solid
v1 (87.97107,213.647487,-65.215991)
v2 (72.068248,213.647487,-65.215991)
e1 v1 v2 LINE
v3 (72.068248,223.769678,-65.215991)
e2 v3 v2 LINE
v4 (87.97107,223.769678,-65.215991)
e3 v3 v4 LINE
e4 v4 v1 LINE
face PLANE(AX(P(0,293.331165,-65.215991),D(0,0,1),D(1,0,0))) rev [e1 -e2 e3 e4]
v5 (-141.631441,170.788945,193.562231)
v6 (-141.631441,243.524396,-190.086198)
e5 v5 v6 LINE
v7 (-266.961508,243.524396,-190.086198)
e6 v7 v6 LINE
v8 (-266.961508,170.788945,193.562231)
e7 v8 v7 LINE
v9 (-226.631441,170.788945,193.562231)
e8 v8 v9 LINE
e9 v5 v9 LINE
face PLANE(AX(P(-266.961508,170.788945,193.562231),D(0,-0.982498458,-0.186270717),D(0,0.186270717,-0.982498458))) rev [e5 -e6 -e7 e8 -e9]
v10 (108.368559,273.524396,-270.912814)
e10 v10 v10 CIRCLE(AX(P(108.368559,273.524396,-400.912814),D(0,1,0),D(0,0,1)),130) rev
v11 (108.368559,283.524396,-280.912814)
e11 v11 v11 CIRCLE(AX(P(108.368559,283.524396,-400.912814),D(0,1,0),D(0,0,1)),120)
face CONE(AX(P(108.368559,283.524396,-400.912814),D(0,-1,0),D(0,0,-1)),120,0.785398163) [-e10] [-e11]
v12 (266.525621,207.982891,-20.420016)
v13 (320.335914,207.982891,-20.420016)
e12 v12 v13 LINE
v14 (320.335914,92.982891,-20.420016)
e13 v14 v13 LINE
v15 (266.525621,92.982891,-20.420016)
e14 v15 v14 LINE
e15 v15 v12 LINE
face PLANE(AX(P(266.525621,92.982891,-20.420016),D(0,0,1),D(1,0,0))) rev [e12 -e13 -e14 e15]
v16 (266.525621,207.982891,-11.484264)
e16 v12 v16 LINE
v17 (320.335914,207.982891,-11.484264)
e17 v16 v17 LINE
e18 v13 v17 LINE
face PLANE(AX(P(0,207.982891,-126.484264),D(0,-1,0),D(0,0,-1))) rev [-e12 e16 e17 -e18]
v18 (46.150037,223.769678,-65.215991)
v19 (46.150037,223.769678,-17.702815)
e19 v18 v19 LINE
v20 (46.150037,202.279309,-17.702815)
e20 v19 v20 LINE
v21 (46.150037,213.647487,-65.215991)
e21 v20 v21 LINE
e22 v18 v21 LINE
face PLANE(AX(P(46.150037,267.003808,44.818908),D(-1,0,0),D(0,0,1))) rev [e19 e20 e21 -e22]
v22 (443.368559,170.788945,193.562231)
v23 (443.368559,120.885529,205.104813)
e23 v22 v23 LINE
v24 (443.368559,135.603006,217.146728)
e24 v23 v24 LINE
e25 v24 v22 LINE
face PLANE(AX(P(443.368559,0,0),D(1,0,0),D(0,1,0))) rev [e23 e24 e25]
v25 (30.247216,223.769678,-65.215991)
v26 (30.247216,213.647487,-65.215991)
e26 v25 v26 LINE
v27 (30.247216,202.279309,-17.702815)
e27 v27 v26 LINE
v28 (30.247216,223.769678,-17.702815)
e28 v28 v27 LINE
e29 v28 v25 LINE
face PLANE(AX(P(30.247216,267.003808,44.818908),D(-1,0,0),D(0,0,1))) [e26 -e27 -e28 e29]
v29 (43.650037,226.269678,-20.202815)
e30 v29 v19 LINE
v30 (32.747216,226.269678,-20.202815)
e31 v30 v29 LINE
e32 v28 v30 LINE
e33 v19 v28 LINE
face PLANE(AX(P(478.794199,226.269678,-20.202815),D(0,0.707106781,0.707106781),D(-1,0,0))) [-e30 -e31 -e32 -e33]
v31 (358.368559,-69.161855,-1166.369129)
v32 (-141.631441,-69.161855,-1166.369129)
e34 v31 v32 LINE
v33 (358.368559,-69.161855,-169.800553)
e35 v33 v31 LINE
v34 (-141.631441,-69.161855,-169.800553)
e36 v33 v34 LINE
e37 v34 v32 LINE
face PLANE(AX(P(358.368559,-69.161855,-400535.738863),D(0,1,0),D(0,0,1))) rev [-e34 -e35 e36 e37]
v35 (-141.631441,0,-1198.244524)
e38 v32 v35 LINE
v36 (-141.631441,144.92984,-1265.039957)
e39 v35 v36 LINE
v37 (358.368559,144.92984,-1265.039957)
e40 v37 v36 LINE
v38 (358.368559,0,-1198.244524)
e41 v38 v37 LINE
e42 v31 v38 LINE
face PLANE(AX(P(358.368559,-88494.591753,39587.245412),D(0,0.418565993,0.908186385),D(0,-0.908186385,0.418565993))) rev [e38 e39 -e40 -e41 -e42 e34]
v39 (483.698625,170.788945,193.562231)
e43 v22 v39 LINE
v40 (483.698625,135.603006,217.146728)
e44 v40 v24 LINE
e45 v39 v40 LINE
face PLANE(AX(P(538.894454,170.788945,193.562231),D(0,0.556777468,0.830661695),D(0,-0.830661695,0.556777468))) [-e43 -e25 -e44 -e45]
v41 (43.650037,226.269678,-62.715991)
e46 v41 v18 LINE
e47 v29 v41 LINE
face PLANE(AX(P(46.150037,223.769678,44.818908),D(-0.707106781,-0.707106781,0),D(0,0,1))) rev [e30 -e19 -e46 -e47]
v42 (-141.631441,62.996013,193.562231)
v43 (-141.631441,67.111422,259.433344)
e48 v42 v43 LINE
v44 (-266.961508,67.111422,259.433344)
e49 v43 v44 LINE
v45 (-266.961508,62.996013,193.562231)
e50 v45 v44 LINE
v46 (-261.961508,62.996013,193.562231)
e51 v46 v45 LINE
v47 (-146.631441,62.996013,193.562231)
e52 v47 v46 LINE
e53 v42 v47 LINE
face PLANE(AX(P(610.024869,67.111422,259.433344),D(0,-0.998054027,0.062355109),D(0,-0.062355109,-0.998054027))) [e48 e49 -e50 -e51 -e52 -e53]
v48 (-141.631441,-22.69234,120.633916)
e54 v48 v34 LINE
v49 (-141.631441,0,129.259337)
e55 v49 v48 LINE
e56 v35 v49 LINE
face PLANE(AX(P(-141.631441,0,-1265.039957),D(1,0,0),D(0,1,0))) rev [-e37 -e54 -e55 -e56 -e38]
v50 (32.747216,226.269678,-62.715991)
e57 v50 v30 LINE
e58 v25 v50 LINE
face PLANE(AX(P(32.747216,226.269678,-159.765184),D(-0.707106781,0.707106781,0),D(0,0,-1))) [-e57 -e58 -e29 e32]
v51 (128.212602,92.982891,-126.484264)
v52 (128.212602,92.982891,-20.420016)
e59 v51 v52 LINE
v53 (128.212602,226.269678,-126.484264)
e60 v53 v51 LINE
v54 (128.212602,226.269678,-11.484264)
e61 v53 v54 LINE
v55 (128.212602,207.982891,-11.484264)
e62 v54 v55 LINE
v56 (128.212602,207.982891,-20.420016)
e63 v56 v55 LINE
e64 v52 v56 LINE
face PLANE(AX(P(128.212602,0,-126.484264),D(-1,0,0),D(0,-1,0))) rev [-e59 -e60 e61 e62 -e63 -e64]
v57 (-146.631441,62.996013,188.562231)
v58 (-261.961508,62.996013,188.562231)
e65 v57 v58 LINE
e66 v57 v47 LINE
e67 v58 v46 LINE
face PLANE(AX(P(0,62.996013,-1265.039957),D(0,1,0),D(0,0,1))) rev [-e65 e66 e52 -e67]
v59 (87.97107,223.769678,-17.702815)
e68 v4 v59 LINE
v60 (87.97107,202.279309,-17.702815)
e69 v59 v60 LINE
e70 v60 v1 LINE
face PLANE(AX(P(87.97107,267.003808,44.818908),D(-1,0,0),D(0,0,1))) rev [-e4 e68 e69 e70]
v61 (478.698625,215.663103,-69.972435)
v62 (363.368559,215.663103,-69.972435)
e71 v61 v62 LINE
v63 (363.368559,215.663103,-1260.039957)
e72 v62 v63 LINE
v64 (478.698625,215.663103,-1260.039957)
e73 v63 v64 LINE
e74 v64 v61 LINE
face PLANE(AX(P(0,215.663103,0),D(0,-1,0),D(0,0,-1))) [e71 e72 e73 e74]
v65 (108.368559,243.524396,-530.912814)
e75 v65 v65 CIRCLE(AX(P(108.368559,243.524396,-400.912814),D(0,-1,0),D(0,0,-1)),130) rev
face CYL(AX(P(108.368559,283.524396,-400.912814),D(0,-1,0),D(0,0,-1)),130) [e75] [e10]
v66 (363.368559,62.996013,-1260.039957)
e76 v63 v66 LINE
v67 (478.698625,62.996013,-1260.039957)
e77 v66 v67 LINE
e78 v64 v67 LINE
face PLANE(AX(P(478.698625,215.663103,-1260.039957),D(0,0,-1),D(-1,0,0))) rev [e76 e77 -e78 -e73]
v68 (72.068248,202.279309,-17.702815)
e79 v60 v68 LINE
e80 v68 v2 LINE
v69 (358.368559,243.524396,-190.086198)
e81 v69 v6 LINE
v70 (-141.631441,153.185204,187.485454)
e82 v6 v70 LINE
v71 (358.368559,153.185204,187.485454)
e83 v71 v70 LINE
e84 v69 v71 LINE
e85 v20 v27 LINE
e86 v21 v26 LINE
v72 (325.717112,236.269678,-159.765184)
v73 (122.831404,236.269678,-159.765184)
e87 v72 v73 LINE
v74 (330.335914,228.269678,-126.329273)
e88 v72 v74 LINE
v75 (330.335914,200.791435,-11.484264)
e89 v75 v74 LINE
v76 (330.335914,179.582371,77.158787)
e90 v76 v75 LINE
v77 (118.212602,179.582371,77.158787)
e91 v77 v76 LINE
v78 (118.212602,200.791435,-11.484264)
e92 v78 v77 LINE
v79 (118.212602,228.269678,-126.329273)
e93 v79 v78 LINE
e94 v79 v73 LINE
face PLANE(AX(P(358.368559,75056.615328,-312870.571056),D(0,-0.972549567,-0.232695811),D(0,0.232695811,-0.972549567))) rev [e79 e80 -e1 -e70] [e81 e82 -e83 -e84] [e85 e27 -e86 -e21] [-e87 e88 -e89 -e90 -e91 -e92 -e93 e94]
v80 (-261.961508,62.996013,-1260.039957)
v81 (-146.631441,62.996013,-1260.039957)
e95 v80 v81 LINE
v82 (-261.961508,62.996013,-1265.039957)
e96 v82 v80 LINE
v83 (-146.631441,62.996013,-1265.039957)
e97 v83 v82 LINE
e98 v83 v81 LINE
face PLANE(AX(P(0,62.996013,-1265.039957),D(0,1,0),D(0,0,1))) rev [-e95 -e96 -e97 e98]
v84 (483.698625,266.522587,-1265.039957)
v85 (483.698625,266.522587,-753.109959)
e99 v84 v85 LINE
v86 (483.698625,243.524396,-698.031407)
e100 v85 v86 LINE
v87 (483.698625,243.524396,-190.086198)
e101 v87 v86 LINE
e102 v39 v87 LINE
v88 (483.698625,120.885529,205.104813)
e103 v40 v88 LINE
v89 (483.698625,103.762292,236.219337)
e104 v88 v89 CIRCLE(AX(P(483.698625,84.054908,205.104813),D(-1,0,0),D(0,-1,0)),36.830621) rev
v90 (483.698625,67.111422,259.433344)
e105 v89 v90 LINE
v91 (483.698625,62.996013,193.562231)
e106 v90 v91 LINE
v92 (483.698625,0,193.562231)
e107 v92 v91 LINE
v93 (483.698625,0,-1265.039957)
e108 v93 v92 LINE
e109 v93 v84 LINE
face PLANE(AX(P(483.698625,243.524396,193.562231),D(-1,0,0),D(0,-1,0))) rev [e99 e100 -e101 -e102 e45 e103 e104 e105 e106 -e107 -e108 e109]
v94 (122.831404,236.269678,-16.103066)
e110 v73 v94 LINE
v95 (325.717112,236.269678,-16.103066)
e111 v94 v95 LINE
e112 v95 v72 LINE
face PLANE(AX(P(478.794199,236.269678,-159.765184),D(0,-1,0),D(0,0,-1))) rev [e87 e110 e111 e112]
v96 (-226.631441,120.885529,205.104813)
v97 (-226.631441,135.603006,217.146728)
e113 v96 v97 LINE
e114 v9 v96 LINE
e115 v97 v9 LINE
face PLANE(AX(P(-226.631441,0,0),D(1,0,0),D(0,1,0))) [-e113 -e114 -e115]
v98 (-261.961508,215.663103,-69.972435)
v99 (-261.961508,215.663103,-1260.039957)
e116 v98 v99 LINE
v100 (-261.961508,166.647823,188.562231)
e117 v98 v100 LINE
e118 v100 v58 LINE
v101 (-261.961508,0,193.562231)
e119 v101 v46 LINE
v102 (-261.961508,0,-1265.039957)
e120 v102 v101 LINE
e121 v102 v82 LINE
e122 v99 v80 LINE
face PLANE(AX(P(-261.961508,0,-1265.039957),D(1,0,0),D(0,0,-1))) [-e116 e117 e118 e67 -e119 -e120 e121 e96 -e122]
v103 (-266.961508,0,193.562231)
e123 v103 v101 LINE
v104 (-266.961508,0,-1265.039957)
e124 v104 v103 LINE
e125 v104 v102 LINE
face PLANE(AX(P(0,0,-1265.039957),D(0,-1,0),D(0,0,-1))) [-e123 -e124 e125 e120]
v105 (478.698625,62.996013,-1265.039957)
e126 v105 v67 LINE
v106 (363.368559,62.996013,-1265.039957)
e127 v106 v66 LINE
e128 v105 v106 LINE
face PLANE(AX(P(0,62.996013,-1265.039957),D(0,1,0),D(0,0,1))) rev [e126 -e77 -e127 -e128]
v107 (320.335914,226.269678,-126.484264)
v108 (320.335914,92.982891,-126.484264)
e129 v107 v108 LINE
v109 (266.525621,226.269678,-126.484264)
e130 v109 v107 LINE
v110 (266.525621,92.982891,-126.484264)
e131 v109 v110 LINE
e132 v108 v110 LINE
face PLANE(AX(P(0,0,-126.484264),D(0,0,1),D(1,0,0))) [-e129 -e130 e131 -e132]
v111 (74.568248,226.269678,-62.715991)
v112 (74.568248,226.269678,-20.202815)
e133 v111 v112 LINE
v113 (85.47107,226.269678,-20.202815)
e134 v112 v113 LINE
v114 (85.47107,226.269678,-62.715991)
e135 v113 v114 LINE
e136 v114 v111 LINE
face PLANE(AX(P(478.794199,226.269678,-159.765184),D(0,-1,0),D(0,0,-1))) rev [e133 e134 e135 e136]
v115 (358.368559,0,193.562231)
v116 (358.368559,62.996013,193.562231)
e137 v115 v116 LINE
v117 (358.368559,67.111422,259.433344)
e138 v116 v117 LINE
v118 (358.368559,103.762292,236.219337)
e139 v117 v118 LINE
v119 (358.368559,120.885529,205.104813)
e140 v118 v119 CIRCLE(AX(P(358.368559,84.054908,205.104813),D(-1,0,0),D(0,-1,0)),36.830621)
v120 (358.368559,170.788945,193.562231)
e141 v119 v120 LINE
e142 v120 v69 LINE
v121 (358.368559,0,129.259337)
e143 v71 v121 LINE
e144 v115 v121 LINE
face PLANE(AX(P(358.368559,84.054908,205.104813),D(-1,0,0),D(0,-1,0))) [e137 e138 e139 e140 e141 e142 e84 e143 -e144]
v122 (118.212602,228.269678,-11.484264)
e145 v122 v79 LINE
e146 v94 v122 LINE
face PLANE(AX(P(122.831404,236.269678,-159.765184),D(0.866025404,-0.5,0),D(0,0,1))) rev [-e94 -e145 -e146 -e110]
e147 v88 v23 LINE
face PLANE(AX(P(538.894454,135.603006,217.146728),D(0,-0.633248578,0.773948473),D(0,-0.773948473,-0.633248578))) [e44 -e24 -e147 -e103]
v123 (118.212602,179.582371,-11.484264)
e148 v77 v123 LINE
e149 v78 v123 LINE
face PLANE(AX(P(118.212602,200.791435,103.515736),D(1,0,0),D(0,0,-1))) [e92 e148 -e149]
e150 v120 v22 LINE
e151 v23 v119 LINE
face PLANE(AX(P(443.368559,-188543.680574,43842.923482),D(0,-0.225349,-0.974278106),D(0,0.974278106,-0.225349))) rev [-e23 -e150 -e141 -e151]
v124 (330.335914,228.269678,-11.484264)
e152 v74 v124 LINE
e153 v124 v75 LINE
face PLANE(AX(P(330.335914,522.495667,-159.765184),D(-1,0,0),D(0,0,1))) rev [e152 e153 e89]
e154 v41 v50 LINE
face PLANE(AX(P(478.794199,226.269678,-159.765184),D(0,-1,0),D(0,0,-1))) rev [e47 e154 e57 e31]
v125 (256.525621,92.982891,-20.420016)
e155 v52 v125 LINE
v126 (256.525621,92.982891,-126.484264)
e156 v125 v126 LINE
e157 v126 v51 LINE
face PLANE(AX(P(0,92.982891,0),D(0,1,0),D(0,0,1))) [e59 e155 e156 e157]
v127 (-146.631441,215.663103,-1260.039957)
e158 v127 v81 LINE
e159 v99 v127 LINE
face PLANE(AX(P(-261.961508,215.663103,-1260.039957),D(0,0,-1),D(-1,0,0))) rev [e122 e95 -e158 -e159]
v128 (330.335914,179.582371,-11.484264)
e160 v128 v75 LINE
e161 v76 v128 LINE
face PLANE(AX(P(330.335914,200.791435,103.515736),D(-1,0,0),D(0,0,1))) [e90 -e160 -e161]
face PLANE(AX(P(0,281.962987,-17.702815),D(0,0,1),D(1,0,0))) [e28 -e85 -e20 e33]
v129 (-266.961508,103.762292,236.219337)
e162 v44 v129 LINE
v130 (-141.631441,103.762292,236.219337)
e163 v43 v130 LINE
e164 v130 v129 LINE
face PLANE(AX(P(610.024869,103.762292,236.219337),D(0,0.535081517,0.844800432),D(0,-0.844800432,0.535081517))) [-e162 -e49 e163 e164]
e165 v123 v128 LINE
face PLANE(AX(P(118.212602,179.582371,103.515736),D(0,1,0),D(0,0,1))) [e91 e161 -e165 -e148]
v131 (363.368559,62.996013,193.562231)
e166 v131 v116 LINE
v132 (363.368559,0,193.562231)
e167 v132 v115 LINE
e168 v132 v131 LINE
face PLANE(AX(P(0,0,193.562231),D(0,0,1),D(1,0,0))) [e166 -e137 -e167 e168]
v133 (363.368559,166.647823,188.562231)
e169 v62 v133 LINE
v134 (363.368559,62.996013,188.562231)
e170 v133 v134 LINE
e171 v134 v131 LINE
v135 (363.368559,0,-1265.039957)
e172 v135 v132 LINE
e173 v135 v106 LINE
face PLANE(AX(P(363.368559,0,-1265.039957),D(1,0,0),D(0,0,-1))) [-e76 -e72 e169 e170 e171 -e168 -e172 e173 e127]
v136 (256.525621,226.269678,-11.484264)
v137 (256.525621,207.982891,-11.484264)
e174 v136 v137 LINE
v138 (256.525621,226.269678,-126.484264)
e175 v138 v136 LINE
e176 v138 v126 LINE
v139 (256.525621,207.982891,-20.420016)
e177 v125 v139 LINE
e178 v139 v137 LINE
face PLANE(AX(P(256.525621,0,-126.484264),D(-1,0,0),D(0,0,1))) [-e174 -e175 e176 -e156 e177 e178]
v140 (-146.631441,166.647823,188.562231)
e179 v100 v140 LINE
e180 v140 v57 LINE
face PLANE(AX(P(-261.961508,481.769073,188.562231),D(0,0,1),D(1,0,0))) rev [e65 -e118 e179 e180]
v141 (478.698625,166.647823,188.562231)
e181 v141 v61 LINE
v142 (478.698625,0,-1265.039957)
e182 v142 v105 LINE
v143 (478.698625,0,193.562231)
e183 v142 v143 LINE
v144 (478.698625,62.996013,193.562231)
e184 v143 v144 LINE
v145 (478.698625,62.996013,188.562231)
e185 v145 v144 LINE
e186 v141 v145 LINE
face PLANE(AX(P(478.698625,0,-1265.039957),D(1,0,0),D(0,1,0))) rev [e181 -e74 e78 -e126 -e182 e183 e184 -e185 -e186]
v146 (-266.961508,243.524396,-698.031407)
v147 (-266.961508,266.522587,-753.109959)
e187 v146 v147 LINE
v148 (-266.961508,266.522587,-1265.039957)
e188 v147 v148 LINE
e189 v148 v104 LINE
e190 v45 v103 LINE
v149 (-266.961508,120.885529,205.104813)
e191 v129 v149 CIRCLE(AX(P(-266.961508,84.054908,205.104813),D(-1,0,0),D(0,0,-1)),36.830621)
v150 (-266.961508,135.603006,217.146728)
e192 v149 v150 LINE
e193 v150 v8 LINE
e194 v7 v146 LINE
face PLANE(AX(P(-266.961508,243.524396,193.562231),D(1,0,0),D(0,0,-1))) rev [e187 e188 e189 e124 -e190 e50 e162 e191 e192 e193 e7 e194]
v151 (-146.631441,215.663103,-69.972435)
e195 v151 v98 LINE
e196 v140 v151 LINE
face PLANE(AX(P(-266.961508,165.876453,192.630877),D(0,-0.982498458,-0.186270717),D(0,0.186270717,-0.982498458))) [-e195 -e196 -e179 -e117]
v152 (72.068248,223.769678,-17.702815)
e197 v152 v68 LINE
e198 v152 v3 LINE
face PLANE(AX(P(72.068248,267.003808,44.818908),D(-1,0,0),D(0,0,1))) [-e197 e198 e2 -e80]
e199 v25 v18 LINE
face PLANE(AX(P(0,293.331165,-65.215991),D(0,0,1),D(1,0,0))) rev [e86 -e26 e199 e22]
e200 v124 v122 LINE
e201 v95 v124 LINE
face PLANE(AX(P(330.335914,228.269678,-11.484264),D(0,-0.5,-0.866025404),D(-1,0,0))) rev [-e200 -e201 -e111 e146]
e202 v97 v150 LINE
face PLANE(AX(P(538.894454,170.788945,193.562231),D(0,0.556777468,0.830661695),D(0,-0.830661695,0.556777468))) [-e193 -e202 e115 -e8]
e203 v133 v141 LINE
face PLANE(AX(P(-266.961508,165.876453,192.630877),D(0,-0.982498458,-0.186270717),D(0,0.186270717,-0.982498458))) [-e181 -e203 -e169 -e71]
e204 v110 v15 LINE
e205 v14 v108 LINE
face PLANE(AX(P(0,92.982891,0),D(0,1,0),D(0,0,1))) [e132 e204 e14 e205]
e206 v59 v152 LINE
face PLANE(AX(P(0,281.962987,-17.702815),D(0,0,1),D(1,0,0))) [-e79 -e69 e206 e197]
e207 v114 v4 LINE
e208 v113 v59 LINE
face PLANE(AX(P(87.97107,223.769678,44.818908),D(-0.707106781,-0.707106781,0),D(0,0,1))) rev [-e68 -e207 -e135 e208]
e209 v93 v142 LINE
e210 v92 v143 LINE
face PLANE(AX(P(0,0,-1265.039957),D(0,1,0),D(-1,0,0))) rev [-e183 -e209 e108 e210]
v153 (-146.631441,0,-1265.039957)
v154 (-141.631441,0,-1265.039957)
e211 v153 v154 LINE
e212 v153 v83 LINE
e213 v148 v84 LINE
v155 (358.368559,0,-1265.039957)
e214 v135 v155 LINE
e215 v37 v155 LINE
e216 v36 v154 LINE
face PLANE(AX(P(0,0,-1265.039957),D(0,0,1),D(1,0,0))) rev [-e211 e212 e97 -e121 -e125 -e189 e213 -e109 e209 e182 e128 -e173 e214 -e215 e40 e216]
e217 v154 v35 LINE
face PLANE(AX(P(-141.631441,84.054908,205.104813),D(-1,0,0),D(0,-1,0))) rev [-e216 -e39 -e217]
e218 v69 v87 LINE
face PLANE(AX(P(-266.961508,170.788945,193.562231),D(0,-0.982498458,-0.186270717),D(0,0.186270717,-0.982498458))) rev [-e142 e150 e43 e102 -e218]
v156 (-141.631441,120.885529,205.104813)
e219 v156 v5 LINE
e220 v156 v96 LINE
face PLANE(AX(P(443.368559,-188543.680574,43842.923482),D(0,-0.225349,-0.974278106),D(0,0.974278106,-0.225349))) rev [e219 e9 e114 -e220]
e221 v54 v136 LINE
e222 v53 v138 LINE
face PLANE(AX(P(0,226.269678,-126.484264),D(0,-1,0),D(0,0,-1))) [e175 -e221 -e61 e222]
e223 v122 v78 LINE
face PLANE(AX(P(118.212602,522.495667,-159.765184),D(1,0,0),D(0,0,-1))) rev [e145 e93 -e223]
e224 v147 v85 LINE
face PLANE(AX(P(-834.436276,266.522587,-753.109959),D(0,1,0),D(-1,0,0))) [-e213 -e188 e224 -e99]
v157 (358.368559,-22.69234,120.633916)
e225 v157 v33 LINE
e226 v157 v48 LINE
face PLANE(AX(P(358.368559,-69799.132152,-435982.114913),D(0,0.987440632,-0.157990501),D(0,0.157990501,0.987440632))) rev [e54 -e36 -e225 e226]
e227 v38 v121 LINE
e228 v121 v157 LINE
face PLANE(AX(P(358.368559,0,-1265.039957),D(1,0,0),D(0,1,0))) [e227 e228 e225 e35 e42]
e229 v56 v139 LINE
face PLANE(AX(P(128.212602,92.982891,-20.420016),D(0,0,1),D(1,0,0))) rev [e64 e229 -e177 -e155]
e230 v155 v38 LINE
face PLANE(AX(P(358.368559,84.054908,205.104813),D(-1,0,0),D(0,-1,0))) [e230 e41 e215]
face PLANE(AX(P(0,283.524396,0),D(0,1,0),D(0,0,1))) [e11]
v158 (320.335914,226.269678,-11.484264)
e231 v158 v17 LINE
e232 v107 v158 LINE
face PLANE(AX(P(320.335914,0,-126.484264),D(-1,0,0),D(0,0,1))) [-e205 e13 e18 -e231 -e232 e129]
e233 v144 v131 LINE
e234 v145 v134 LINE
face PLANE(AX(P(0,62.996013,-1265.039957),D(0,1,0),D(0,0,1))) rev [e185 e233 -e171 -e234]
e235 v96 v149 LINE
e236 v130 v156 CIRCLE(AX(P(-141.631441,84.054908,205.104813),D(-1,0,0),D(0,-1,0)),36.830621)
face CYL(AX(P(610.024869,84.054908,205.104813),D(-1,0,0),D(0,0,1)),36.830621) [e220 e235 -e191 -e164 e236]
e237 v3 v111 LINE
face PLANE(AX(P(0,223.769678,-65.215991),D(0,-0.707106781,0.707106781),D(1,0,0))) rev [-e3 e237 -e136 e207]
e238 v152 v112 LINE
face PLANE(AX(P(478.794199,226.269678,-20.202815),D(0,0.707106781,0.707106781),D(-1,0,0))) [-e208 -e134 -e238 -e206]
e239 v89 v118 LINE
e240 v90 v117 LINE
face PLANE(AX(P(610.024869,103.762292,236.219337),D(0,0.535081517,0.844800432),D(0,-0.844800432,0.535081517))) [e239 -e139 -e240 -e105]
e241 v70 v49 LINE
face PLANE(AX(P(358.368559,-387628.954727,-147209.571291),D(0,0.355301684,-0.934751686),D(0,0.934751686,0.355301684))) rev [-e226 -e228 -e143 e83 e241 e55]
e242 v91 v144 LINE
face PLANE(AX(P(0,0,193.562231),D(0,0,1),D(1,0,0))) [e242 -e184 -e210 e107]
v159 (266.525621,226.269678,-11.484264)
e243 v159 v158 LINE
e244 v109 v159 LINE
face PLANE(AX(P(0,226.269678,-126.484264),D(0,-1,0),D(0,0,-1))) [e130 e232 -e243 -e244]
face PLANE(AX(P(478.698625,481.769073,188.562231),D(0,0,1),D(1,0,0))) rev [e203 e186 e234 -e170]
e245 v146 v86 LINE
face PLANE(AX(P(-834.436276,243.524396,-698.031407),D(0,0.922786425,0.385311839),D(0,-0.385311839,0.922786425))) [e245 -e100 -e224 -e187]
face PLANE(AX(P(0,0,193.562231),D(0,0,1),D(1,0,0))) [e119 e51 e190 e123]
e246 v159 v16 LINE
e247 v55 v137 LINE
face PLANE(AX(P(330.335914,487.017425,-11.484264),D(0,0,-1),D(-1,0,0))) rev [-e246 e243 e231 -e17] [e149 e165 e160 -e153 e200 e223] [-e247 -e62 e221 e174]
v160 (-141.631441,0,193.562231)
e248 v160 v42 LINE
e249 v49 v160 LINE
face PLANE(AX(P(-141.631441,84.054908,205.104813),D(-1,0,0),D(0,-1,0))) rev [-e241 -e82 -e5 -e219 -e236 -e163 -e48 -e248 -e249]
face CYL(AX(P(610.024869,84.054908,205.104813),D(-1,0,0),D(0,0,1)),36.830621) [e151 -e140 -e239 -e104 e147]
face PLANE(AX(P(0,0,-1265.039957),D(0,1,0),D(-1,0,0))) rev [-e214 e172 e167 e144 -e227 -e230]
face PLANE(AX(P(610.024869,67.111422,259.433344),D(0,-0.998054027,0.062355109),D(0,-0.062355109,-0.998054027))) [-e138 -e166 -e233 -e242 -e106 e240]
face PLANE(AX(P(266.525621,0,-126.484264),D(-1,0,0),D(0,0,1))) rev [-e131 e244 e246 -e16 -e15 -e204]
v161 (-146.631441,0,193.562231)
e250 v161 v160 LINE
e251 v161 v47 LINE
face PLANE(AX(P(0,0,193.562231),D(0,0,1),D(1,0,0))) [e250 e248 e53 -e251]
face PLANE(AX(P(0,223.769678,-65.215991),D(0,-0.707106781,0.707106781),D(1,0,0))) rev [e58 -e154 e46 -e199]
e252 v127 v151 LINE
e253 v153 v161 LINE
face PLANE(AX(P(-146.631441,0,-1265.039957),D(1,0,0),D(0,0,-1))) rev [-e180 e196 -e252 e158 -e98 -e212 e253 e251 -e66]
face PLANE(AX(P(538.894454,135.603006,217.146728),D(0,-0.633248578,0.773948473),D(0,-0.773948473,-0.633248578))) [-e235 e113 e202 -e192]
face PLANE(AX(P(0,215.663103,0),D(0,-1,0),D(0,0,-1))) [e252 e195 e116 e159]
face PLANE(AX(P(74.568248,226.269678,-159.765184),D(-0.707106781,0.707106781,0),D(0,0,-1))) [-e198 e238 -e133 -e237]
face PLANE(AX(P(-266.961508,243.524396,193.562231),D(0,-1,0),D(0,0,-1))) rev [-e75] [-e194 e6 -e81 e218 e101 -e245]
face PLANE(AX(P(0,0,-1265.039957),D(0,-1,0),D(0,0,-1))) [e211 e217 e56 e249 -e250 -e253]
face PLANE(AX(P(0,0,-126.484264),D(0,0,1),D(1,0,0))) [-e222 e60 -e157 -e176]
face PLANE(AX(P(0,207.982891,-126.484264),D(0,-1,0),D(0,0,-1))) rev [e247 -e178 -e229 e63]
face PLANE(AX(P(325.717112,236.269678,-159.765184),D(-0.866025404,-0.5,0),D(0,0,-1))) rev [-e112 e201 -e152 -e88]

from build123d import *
from OCP.BRepAlgoAPI import BRepAlgoAPI_Cut
from OCP.TopTools import TopTools_ListOfShape
from OCP.BRepFilletAPI import BRepFilletAPI_MakeChamfer

# Parameters (mm, degrees)
BOSS_EXTRUDE1_DEPTH      = 193.56223071
BOSS_EXTRUDE1_DEPTH_BACK = 1265.039956588
SKETCH1_W                = 750.660133044
SKETCH1_H                = 349.862732427
SKETCH3_R                = 130
BOSS_EXTRUDE2_DEPTH      = 40
CUT_EXTRUDE1_DEPTH       = 1499.066357024
BOSS_EXTRUDE3_DEPTH      = 750.660133044
CHAMFER7_SIZE            = 10
BOSS_EXTRUDE4_DEPTH      = 750.660133044
CUT_EXTRUDE10_START      = -375.330067
CUT_EXTRUDE10_DEPTH      = 250
SKETCH22_W               = 125.330066522
SKETCH22_H               = 106.338336752
SKETCH22_W_2             = 115.330066522
SKETCH22_H_2             = 62.996013083
CUT_EXTRUDE11_DEPTH      = 1563.648643762
CUT_EXTRUDE12_REACH      = 1374.196
SKETCH24_W               = 115.330066522
SKETCH24_H               = 258.53466534
SKETCH25_W               = 115.330066522
SKETCH25_H               = 1190.067521958
CUT_EXTRUDE13_DEPTH      = 152.66709
BOSS_EXTRUDE5_REACH      = 1461.802
SKETCH27_W               = 212.123312066
SKETCH27_H               = 152.466183094
SKETCH28_W               = 148.280920275
SKETCH28_H               = 7.25471817
CUT_EXTRUDE14_DEPTH      = 212.123312065
SKETCH30_W               = 212.123312066
SKETCH30_H               = 21.209064542
CUT_EXTRUDE15_DEPTH      = 115
SKETCH31_W               = 128.313019002
SKETCH31_H               = 18.286786033
SKETCH31_W_2             = 53.810293064
CUT_EXTRUDE16_DEPTH      = 115
SKETCH32_W               = 128.313019002
SKETCH32_H               = 106.064247612
SKETCH32_W_2             = 53.810293064
CUT_EXTRUDE17_DEPTH      = 115
BOSS_EXTRUDE6_REACH      = 1500.066
CUT_EXTRUDE18_START      = -375.330067
CUT_EXTRUDE18_DEPTH      = 335
CHAMFER8_SIZE            = 8
CHAMFER8_SIZE2           = 4.618802154
BOSS_EXTRUDE7_REACH      = 1461.802
CHAMFER9_SIZE            = 2.5


with BuildPart() as part:
    # Sketch1 → Boss-Extrude1 (new, two sides: drawn at the far end of the back side and taken through both)
    with BuildSketch(Plane.XY.offset(-BOSS_EXTRUDE1_DEPTH_BACK)):
        with Locations((108.368558778, 68.593029462)):
            Rectangle(SKETCH1_W, SKETCH1_H)
    extrude(amount=BOSS_EXTRUDE1_DEPTH + BOSS_EXTRUDE1_DEPTH_BACK)

    # Sketch3 → Boss-Extrude2 (add)
    with BuildSketch(Plane(origin=(0, 243.524395675, 0), x_dir=(1, 0, 0), z_dir=(0, 1, 0))):
        with Locations(Location((108.368558778, 400.912813637, 0), (0, 0, 90))):
            Circle(SKETCH3_R)
    extrude(amount=BOSS_EXTRUDE2_DEPTH)

    # Sketch5 → Cut-Extrude1 (cut, through all)
    with BuildSketch(Plane(origin=(483.6986253, 0, 0), x_dir=(0, 0, -1), z_dir=(1, 0, 0))):
        Polygon((-193.56223071, 170.788945028), (190.086198144, 243.524395675), (-193.56223071, 243.524395675), align=None)
    extrude(amount=-CUT_EXTRUDE1_DEPTH, mode=Mode.SUBTRACT)

    # Sketch7 → Boss-Extrude3 (add)
    with BuildSketch(Plane(origin=(483.6986253, 0, 0), x_dir=(0, 0, -1), z_dir=(1, 0, 0))):
        Polygon((698.031406741, 243.524395675), (753.10995922, 266.522586582), (1265.039956588, 266.522586582), (1265.039956588, 243.524395675), align=None)
    extrude(amount=-BOSS_EXTRUDE3_DEPTH)

    # Chamfer7
    chamfer7_edges = [part.edges().sort_by_distance(p)[0] for p in [
        (108.368558778, 283.524395675, -270.912813637),
    ]]
    chamfer(chamfer7_edges, length=CHAMFER7_SIZE)

    # Sketch21 → Boss-Extrude4 (add)
    with BuildSketch(Plane.ZY.offset(266.961507744)):
        with BuildLine():
            Line((236.219336917, 103.762292304), (259.433344062, 67.111421995))
            Line((259.433344062, 67.111421995), (193.56223071, 62.996013083))
            Line((193.56223071, 62.996013083), (193.56223071, 120.885528527))
            Line((193.56223071, 120.885528527), (193.56223071, 170.788945028))
            Line((193.56223071, 170.788945028), (205.104812792, 120.885528527))
            ThreePointArc((205.104812792, 120.885528527), (222.862338171, 116.321994956), (236.219336917, 103.762292304))
        make_face()
    extrude(amount=-BOSS_EXTRUDE4_DEPTH)

    # Sketch20 → Cut-Extrude10 (cut, symmetric)
    with BuildSketch(Plane.ZY.offset(266.961507744).offset(CUT_EXTRUDE10_START)):
        Polygon((187.485453539, 153.18520382), (120.633916065, -22.69233968), (-169.800553019, -69.161854733), (-1166.369128547, -69.161854733), (-1265.039956588, 144.92983962), (-1265.039956588, -106.338336752), (316.242531376, -106.338336752), (316.242531376, 170.788945028), (193.56223071, 170.788945028), (-190.086198144, 243.524395675), align=None)
    extrude(amount=CUT_EXTRUDE10_DEPTH, both=True, mode=Mode.SUBTRACT)


with BuildPart() as cut_extrude11_tool:
    # Sketch22 → Cut-Extrude11 (new, through all)
    with BuildSketch(Plane.XY.offset(193.56223071)):
        with Locations((-204.296474483, -53.169168376)):
            Rectangle(SKETCH22_W, SKETCH22_H)
        with Locations((-204.296474483, 31.498006542)):
            Rectangle(SKETCH22_W_2, SKETCH22_H_2)
        with Locations((421.033592039, 31.498006542)):
            Rectangle(SKETCH22_W_2, SKETCH22_H_2)
        with Locations((421.033592039, -53.169168376)):
            Rectangle(SKETCH22_W, SKETCH22_H)
    extrude(amount=-CUT_EXTRUDE11_DEPTH)


with BuildPart() as part_1:
    add(part.part)

    # Cut-Extrude11: cut by cut_extrude11_tool, with a tolerance
    cut_extrude11_stock = TopTools_ListOfShape()
    cut_extrude11_stock.Append(part_1.part.wrapped)
    cut_extrude11_tools = TopTools_ListOfShape()
    cut_extrude11_tools.Append(cut_extrude11_tool.part.wrapped)
    cut_extrude11_cut = BRepAlgoAPI_Cut()
    cut_extrude11_cut.SetArguments(cut_extrude11_stock)
    cut_extrude11_cut.SetTools(cut_extrude11_tools)
    cut_extrude11_cut.SetFuzzyValue(0.00001)
    cut_extrude11_cut.Build()
    add(Compound.cast(cut_extrude11_cut.Shape()).solids(), mode=Mode.REPLACE)

    # Cut-Extrude12: up to this plane
    cut_extrude12_end = Plane(origin=(-266.961507744, 165.876452738, 192.630877123), z_dir=(0, -0.9824984579201473, -0.18627071746394425))
    # Sketch24 → Cut-Extrude12 (cut, up to the surface)
    with BuildSketch(Plane.XZ.offset(-62.996013083), mode=Mode.PRIVATE) as cut_extrude12_sk1:
        with Locations((-204.296474483, 59.29489804)):
            Rectangle(SKETCH24_W, SKETCH24_H)
    cut_extrude12_tool1 = split(extrude(cut_extrude12_sk1.sketch, amount=-CUT_EXTRUDE12_REACH, mode=Mode.PRIVATE), bisect_by=cut_extrude12_end, keep=Keep.BOTH, mode=Mode.PRIVATE)
    add(cut_extrude12_tool1.solids().sort_by_distance((-204.296474, 62.996013, 59.294898))[0], mode=Mode.SUBTRACT)
    # Sketch24 → Cut-Extrude12 (cut, up to the surface)
    with BuildSketch(Plane.XZ.offset(-62.996013083), mode=Mode.PRIVATE) as cut_extrude12_sk2:
        with Locations((421.033592039, 59.29489804)):
            Rectangle(SKETCH24_W, SKETCH24_H)
    cut_extrude12_tool2 = split(extrude(cut_extrude12_sk2.sketch, amount=-CUT_EXTRUDE12_REACH, mode=Mode.PRIVATE), bisect_by=cut_extrude12_end, keep=Keep.BOTH, mode=Mode.PRIVATE)
    add(cut_extrude12_tool2.solids().sort_by_distance((421.033592, 62.996013, 59.294898))[0], mode=Mode.SUBTRACT)

    # Sketch25 → Cut-Extrude13 (cut)
    with BuildSketch(Plane.XZ.offset(-62.996013083)):
        with Locations((-204.296474483, -665.006195609)):
            Rectangle(SKETCH25_W, SKETCH25_H)
        with Locations((421.033592039, -665.006195609)):
            Rectangle(SKETCH25_W, SKETCH25_H)
    extrude(amount=-CUT_EXTRUDE13_DEPTH, mode=Mode.SUBTRACT)

    # Boss-Extrude5: up to this plane
    boss_extrude5_end = Plane(origin=(-266.961507744, 243.524395675, 193.56223071), z_dir=(0, -1, 0))
    # Sketch27 → Boss-Extrude5 (add, up to the surface)
    with BuildSketch(Plane(origin=(0, 187.320129902, 44.818908088), x_dir=(1, 0, 0), z_dir=(0, 0.9725495665123397, 0.2326958114721023)), mode=Mode.PRIVATE) as boss_extrude5_sk1:
        with Locations((224.274258106, 134.125433145)):
            Rectangle(SKETCH27_W, SKETCH27_H)
    boss_extrude5_tool1 = split(extrude(boss_extrude5_sk1.sketch, amount=BOSS_EXTRUDE5_REACH, dir=(0, 1, 0), mode=Mode.PRIVATE), bisect_by=boss_extrude5_end, keep=Keep.BOTH, mode=Mode.PRIVATE)
    add(boss_extrude5_tool1.solids().sort_by_distance((224.274258, 218.530556, -85.624724))[0])

    # Sketch28 → Cut-Extrude14 (cut)
    with BuildSketch(Plane.ZY.offset(-118.212602073)):
        with Locations((-85.624723776, 239.89703659)):
            Rectangle(SKETCH28_W, SKETCH28_H)
    extrude(amount=-CUT_EXTRUDE14_DEPTH, mode=Mode.SUBTRACT)

    # Sketch30 → Cut-Extrude15 (cut)
    with BuildSketch(Plane.XY.offset(-11.484263638)):
        with Locations((224.274258106, 190.186903037)):
            Rectangle(SKETCH30_W, SKETCH30_H)
    extrude(amount=CUT_EXTRUDE15_DEPTH, mode=Mode.SUBTRACT)

    # Sketch31 → Cut-Extrude16 (cut)
    with BuildSketch(Plane.XY.offset(-11.484263638)):
        with Locations((192.369111574, 217.126284489)):
            Rectangle(SKETCH31_W, SKETCH31_H)
        with Locations((293.430767607, 217.126284489)):
            Rectangle(SKETCH31_W_2, SKETCH31_H)
    extrude(amount=-CUT_EXTRUDE16_DEPTH, mode=Mode.SUBTRACT)

    # Sketch32 → Cut-Extrude17 (cut)
    with BuildSketch(Plane(origin=(0, 207.982891472, 0), x_dir=(1, 0, 0), z_dir=(0, 1, 0))):
        with Locations((192.369111574, 73.452139832)):
            Rectangle(SKETCH32_W, SKETCH32_H)
        with Locations((293.430767607, 73.452139832)):
            Rectangle(SKETCH32_W_2, SKETCH32_H)
    extrude(amount=-CUT_EXTRUDE17_DEPTH, mode=Mode.SUBTRACT)

    # Boss-Extrude6: up to this face of the body (flat: up to its plane)
    boss_extrude6_end = Plane(part_1.part.faces().sort_by_distance((483.6986253, 122.340997746, -568.947125817))[0])
    # Sketch34 → Boss-Extrude6 (add, up to the picked face)
    with BuildSketch(Plane.ZY.offset(266.961507744), mode=Mode.PRIVATE) as boss_extrude6_sk1:
        Polygon((193.56223071, 170.788945028), (217.146727568, 135.603005806), (205.104812792, 120.885528527), align=None)
    boss_extrude6_tool1 = split(extrude(boss_extrude6_sk1.sketch, amount=-BOSS_EXTRUDE6_REACH, mode=Mode.PRIVATE), bisect_by=boss_extrude6_end, keep=Keep.BOTH, mode=Mode.PRIVATE)
    add(boss_extrude6_tool1.solids().sort_by(Axis((-266.961508, 142.425826, 205.271257), (1, 0, 0)))[0])

    # Sketch35 → Cut-Extrude18 (cut, symmetric)
    with BuildSketch(Plane.ZY.offset(266.961507744).offset(CUT_EXTRUDE18_START)):
        Polygon((205.104812792, 120.885528527), (193.56223071, 170.788945028), (217.146727568, 135.603005806), align=None)
    extrude(amount=CUT_EXTRUDE18_DEPTH, both=True, mode=Mode.SUBTRACT)

    # Chamfer8: one chamfer whose edges measure the first distance from different faces: ONE call of the kernel's chamfer builder (chamfer() names one face for all edges)
    chamfer8_edges_1 = [part_1.edges().sort_by_distance(p)[0] for p in [
        (224.274258106, 236.269677505, -11.484263638),
    ]]
    chamfer8_side_1 = [part_1.faces().sort_by_distance(p)[0] for p in [
        (225.057773378, 204.40173967, -11.484263638),
    ]]
    chamfer8_edges_2 = [part_1.edges().sort_by_distance(p)[0] for p in [
        (118.212602073, 236.269677505, -85.624723775),
    ]]
    chamfer8_side_2 = [part_1.faces().sort_by_distance(p)[0] for p in [
        (118.212602073, 224.443596773, -60.911237063),
    ]]
    chamfer8_edges_3 = [part_1.edges().sort_by_distance(p)[0] for p in [
        (330.335914138, 236.269677505, -85.624723775),
    ]]
    chamfer8_side_3 = [part_1.faces().sort_by_distance(p)[0] for p in [
        (330.335914139, 224.443596773, -60.911237063),
    ]]
    chamfer8 = BRepFilletAPI_MakeChamfer(part_1.part.solid().wrapped)
    for e in chamfer8_edges_1:
        chamfer8.Add(CHAMFER8_SIZE, CHAMFER8_SIZE2, e.wrapped, chamfer8_side_1[0].wrapped)  # the first distance lies on this face
    for e in chamfer8_edges_2:
        chamfer8.Add(CHAMFER8_SIZE, CHAMFER8_SIZE2, e.wrapped, chamfer8_side_2[0].wrapped)  # the first distance lies on this face
    for e in chamfer8_edges_3:
        chamfer8.Add(CHAMFER8_SIZE, CHAMFER8_SIZE2, e.wrapped, chamfer8_side_3[0].wrapped)  # the first distance lies on this face
    add(Compound.cast(chamfer8.Shape()), mode=Mode.REPLACE)

    # Boss-Extrude7: up to this plane
    boss_extrude7_end = Plane(origin=(478.794198695, 226.269677505, -159.765183913), z_dir=(0, -1, 0))
    # Sketch36 → Boss-Extrude7 (add, up to the surface)
    with BuildSketch(Plane(origin=(0, 187.320129902, 44.818908088), x_dir=(1, 0, 0), z_dir=(0, 0.9725495665123397, 0.2326958114721023)), mode=Mode.PRIVATE) as boss_extrude7_sk1:
        Polygon((72.068248118, 64.286413464), (87.971069757, 64.286413464), (87.971069757, 113.140659417), (72.068248118, 113.140659417), (72.068248118, 96.084936844), align=None)
    boss_extrude7_tool1 = split(extrude(boss_extrude7_sk1.sketch, amount=BOSS_EXTRUDE7_REACH, dir=(0, 1, 0), mode=Mode.PRIVATE), bisect_by=boss_extrude7_end, keep=Keep.BOTH, mode=Mode.PRIVATE)
    add(boss_extrude7_tool1.solids().sort_by_distance((80.019659, 207.963398, -41.459403))[0])
    # Sketch36 → Boss-Extrude7 (add, up to the surface)
    with BuildSketch(Plane(origin=(0, 187.320129902, 44.818908088), x_dir=(1, 0, 0), z_dir=(0, 0.9725495665123397, 0.2326958114721023)), mode=Mode.PRIVATE) as boss_extrude7_sk2:
        Polygon((30.247215503, 64.286413464), (46.150037141, 64.286413464), (46.150037141, 96.084936844), (46.150037141, 113.140659417), (30.247215503, 113.140659417), align=None)
    boss_extrude7_tool2 = split(extrude(boss_extrude7_sk2.sketch, amount=BOSS_EXTRUDE7_REACH, dir=(0, 1, 0), mode=Mode.PRIVATE), bisect_by=boss_extrude7_end, keep=Keep.BOTH, mode=Mode.PRIVATE)
    add(boss_extrude7_tool2.solids().sort_by_distance((38.198626, 207.963398, -41.459403))[0])

    # Chamfer9
    chamfer9_edges = [part_1.edges().sort_by_distance(p)[0] for p in [
        (80.019658938, 226.269677505, -65.215991183),
        (87.971069757, 226.269677505, -41.459403321),
        (72.068248118, 226.269677505, -41.459403321),
        (80.019658938, 226.269677505, -17.702815459),
        (38.198626322, 226.269677505, -65.215991183),
        (46.150037141, 226.269677505, -41.459403321),
        (30.247215503, 226.269677505, -41.459403321),
        (38.198626322, 226.269677505, -17.702815459),
    ]]
    chamfer(chamfer9_edges, length=CHAMFER9_SIZE)


solid = part_1.part
